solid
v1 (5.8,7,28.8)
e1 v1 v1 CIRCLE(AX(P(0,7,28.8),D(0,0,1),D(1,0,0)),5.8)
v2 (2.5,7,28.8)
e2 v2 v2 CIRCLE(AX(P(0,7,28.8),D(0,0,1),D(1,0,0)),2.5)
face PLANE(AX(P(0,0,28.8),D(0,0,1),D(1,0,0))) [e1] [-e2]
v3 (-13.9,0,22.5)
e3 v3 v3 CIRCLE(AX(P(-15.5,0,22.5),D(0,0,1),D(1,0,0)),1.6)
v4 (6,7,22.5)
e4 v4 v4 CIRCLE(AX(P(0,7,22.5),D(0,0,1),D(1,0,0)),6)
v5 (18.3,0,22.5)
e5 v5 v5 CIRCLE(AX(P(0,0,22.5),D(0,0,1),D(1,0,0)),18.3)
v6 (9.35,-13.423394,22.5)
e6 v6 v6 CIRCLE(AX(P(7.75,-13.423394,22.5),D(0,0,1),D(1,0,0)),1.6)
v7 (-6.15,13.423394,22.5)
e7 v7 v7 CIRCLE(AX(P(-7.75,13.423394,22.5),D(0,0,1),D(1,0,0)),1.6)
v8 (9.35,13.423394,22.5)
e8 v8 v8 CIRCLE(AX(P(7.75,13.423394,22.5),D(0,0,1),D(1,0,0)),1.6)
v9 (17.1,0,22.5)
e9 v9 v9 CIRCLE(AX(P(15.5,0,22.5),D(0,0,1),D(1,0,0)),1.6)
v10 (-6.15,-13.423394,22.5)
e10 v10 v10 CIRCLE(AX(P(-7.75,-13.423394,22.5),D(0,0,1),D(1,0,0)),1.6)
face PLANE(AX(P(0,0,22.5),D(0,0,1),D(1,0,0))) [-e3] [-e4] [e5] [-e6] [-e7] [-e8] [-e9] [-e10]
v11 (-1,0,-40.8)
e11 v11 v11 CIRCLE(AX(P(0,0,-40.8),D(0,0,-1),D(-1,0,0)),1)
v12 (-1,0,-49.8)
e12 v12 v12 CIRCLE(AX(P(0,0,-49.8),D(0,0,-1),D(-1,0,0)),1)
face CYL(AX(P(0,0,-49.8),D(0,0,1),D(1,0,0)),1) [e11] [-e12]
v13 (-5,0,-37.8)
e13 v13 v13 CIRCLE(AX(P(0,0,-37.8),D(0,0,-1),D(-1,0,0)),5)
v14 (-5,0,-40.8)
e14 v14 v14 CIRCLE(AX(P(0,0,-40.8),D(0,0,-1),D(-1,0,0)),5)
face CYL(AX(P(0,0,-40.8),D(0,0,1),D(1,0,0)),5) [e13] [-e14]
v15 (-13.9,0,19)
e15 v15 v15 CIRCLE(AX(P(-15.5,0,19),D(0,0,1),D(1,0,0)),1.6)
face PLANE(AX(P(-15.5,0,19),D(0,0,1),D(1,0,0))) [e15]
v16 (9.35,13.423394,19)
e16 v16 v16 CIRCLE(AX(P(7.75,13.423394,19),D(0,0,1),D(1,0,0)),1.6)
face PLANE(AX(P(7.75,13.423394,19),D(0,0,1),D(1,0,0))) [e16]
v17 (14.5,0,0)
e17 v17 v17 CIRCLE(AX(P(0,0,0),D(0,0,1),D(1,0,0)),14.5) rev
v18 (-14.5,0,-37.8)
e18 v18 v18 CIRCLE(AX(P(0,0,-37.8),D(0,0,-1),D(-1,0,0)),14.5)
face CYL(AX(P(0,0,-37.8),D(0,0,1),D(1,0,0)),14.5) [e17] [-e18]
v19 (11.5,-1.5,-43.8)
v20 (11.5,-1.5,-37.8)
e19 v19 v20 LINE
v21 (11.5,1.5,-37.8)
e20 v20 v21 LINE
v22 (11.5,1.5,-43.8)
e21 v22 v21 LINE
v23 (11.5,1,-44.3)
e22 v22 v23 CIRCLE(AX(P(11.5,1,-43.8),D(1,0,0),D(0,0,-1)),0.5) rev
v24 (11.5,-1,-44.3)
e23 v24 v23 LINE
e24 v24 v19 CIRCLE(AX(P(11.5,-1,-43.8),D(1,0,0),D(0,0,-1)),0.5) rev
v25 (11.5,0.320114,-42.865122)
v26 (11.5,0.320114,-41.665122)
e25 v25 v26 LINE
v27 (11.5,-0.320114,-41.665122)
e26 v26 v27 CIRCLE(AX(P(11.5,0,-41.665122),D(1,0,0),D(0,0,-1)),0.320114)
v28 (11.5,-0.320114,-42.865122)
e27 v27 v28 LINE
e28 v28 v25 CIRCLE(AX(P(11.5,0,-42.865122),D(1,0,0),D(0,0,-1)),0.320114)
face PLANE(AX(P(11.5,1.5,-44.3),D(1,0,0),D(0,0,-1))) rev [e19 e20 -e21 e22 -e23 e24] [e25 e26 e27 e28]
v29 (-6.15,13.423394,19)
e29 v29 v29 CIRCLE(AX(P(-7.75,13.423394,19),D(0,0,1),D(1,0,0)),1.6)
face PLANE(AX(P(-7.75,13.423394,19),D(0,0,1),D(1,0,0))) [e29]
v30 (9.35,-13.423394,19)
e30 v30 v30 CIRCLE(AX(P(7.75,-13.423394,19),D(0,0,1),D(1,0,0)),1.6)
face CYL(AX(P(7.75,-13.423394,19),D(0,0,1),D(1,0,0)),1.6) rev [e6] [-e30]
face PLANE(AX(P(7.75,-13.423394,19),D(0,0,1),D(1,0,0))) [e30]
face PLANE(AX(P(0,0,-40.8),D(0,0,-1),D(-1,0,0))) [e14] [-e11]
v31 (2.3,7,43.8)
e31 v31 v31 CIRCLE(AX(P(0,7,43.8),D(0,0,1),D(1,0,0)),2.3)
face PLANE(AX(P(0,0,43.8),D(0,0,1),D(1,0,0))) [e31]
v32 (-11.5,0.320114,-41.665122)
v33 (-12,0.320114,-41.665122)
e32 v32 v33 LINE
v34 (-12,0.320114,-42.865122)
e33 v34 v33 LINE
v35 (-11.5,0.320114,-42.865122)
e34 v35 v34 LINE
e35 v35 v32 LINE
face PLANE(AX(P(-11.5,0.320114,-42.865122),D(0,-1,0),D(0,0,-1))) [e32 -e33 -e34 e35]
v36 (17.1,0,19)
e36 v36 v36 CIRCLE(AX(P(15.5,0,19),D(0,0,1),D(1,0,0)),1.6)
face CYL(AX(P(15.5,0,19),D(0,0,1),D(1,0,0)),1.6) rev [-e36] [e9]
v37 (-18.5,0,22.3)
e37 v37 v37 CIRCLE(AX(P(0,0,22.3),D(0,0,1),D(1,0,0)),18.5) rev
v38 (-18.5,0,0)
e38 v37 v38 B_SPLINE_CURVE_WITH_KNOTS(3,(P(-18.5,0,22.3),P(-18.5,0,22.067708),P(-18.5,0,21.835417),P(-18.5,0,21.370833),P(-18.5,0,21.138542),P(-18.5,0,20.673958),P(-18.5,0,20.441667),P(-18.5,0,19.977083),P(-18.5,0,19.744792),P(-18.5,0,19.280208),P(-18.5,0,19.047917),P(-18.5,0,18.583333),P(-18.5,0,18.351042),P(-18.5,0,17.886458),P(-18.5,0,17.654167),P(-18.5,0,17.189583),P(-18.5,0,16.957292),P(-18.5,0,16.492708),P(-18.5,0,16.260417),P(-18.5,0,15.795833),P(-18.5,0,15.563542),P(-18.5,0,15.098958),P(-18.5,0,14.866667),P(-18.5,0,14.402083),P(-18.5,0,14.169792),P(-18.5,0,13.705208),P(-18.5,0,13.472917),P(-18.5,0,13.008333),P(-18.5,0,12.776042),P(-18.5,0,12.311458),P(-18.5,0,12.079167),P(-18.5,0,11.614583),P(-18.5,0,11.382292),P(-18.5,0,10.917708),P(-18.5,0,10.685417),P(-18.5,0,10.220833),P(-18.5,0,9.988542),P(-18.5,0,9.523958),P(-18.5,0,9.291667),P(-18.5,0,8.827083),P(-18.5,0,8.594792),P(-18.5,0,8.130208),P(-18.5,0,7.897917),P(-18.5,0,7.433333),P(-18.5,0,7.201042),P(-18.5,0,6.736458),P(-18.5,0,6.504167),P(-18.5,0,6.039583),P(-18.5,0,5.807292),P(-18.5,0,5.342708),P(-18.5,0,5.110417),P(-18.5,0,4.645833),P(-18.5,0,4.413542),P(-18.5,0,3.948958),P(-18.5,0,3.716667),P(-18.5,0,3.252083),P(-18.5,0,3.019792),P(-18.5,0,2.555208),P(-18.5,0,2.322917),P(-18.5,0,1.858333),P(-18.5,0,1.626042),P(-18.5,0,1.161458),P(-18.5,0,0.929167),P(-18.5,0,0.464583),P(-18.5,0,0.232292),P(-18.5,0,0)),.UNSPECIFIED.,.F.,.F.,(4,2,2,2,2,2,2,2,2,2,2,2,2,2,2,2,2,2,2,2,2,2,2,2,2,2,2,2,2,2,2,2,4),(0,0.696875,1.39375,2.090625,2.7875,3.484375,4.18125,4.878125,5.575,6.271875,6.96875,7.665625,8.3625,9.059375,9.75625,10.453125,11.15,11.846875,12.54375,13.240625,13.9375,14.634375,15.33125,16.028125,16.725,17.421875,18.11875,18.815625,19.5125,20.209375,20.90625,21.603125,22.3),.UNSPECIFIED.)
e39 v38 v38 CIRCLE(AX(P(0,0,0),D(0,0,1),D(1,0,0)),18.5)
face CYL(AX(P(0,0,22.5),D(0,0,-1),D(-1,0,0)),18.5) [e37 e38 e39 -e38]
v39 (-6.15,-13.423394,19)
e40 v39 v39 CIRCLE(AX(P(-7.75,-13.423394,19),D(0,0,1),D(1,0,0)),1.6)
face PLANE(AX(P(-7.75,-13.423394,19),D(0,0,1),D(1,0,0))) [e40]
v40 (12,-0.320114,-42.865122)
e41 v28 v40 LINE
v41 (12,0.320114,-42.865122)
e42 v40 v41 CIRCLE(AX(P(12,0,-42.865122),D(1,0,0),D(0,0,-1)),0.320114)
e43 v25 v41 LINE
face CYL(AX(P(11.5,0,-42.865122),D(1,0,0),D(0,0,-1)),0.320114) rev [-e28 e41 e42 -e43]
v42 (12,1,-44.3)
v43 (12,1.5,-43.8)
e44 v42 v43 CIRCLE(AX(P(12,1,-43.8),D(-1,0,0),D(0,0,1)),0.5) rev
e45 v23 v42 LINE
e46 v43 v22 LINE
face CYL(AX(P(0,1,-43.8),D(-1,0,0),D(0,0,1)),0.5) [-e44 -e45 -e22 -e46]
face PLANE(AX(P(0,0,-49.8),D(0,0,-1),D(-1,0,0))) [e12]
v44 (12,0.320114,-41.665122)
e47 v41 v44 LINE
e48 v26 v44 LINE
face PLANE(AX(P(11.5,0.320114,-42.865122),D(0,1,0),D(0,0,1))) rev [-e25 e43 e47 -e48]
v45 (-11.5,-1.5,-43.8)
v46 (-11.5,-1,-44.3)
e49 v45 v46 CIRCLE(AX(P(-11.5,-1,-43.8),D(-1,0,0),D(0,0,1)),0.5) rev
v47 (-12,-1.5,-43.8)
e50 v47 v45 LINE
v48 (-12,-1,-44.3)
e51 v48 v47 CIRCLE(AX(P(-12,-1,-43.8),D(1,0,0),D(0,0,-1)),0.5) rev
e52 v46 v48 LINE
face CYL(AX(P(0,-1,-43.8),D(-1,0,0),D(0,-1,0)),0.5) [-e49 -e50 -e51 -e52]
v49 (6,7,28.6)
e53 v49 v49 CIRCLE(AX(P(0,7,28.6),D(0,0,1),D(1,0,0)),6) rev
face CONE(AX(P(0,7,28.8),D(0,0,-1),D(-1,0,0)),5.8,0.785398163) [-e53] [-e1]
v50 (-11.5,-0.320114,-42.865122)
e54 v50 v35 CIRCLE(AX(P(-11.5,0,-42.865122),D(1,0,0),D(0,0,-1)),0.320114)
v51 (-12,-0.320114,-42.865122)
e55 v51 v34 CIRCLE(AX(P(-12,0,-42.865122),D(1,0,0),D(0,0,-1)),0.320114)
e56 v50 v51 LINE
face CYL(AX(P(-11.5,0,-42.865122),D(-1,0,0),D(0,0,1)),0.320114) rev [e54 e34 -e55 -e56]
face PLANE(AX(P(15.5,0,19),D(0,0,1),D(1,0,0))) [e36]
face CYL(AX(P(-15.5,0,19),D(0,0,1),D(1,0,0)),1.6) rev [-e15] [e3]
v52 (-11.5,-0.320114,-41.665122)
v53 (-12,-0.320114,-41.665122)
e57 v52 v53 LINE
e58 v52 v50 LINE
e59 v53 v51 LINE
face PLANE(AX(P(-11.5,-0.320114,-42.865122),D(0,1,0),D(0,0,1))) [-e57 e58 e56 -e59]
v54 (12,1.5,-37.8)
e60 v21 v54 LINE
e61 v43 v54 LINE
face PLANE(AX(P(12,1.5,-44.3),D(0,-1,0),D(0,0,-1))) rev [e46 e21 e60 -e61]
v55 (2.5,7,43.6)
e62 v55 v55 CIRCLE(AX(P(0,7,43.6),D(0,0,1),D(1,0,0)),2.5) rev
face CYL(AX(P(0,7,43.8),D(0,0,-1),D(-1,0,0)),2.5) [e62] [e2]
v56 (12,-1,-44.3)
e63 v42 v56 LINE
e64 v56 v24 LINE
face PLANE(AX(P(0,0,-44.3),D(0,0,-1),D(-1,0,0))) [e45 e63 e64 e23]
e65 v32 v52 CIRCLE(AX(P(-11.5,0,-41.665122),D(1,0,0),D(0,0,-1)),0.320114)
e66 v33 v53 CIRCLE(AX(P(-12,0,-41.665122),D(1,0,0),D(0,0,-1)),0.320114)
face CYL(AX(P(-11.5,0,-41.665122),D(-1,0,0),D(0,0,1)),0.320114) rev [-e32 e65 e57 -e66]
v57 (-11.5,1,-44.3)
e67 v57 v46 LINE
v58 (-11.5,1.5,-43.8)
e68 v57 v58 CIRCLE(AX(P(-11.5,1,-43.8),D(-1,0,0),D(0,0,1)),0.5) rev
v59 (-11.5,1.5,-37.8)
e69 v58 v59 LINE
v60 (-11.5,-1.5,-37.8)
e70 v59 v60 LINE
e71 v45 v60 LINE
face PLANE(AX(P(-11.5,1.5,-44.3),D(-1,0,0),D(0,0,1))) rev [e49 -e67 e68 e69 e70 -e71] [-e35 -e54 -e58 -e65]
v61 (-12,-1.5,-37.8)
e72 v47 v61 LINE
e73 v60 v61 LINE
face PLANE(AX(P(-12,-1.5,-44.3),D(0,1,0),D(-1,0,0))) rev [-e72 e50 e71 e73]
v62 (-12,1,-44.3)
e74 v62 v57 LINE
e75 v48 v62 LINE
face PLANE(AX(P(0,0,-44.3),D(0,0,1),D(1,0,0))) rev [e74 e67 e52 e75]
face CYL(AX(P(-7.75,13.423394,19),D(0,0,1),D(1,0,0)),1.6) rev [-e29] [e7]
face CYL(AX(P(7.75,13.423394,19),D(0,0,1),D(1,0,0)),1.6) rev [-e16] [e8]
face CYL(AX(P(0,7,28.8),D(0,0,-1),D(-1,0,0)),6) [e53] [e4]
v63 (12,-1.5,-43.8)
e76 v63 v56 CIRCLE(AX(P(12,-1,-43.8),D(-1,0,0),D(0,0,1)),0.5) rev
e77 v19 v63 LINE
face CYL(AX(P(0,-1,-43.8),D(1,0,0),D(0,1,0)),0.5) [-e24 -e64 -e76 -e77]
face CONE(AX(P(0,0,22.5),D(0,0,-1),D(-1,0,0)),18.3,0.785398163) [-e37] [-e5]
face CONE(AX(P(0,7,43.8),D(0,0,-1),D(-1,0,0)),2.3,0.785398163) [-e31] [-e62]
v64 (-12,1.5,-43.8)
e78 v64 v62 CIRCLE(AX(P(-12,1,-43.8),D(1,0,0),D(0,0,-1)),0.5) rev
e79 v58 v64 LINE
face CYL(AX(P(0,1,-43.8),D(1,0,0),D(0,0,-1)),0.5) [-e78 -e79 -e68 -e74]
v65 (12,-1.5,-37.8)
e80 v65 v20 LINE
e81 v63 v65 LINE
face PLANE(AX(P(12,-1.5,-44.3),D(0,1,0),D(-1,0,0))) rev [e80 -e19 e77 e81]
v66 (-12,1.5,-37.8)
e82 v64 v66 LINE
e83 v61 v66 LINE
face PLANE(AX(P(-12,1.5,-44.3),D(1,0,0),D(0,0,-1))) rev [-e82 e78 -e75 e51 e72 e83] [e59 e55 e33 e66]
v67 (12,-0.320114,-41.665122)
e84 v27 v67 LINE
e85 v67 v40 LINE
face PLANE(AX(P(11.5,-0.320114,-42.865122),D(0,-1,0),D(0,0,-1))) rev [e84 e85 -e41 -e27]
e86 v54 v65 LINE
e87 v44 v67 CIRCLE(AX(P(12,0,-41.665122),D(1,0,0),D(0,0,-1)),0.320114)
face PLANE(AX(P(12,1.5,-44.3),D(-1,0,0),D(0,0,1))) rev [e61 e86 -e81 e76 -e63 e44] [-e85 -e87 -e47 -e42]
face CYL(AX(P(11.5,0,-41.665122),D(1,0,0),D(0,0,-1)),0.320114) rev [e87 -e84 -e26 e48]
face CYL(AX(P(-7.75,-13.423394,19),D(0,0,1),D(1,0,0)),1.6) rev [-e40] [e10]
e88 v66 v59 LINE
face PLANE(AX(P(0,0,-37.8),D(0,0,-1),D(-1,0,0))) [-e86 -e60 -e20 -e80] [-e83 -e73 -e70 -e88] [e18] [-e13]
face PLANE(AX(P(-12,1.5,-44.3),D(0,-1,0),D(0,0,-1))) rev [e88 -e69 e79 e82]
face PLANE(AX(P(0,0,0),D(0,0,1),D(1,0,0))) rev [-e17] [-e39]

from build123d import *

# Parameters (mm, degrees)
SKETCH1_R           = 18.5
BOSS_EXTRUDE1_DEPTH = 22.5
SKETCH2_R           = 1.6
CUT_EXTRUDE1_DEPTH  = 3.5
SKETCH3_R           = 2.5
BOSS_EXTRUDE2_DEPTH = 21.3
SKETCH3_3_R         = 6
SKETCH3_3_R_2       = 2.5
BOSS_EXTRUDE3_DEPTH = 6.3
SKETCH4_R           = 14.5
BOSS_EXTRUDE4_DEPTH = 37.8
SKETCH5_R           = 5
BOSS_EXTRUDE5_DEPTH = 3
SKETCH6_R           = 1
BOSS_EXTRUDE6_DEPTH = 9
SKETCH7_W           = 0.5
SKETCH7_H           = 3
BOSS_EXTRUDE7_DEPTH = 6.5
CUT_EXTRUDE2_DEPTH  = 0.5
FILLET1_R           = 0.5
CHAMFER1_SIZE       = 0.2


with BuildPart() as part:
    # Sketch1 → Boss-Extrude1 (new body)
    with BuildSketch(Plane.XY):
        Circle(SKETCH1_R)
    extrude(amount=BOSS_EXTRUDE1_DEPTH)

    # Sketch2 → Cut-Extrude1 (cut)
    with BuildSketch(Plane.XY.offset(22.5)):
        with Locations((-7.75, 13.423393759)):
            Circle(SKETCH2_R)
        with Locations((7.75, 13.423393759)):
            Circle(SKETCH2_R)
        with Locations((-15.5, 0)):
            Circle(SKETCH2_R)
        with Locations((-7.75, -13.423393759)):
            Circle(SKETCH2_R)
        with Locations((7.75, -13.423393759)):
            Circle(SKETCH2_R)
        with Locations((15.5, 0)):
            Circle(SKETCH2_R)
    extrude(amount=-CUT_EXTRUDE1_DEPTH, mode=Mode.SUBTRACT)

    # Sketch3 → Boss-Extrude2 (add)
    with BuildSketch(Plane.XY.offset(22.5)):
        with Locations((0, 7)):
            Circle(SKETCH3_R)
    extrude(amount=BOSS_EXTRUDE2_DEPTH)

    # Sketch3<3> → Boss-Extrude3 (add)
    with BuildSketch(Plane.XY.offset(22.5)):
        with Locations((0, 7)):
            Circle(SKETCH3_3_R)
        with Locations((0, 7)):
            Circle(SKETCH3_3_R_2, mode=Mode.SUBTRACT)
    extrude(amount=BOSS_EXTRUDE3_DEPTH)

    # Sketch4 → Boss-Extrude4 (add)
    with BuildSketch(Plane(origin=(0, 0, 0), x_dir=(-1, 0, 0), z_dir=(0, 0, -1))):
        Circle(SKETCH4_R)
    extrude(amount=BOSS_EXTRUDE4_DEPTH)

    # Sketch5 → Boss-Extrude5 (add)
    with BuildSketch(Plane(origin=(0, 0, -37.8), x_dir=(-1, 0, 0), z_dir=(0, 0, -1))):
        Circle(SKETCH5_R)
    extrude(amount=BOSS_EXTRUDE5_DEPTH)

    # Sketch6 → Boss-Extrude6 (add)
    with BuildSketch(Plane(origin=(0, 0, -40.8), x_dir=(-1, 0, 0), z_dir=(0, 0, -1))):
        Circle(SKETCH6_R)
    extrude(amount=BOSS_EXTRUDE6_DEPTH)

    # Sketch7 → Boss-Extrude7 (add)
    with BuildSketch(Plane(origin=(0, 0, -37.8), x_dir=(-1, 0, 0), z_dir=(0, 0, -1))):
        with Locations((-11.75, 0)):
            Rectangle(SKETCH7_W, SKETCH7_H)
        with Locations((11.75, 0)):
            Rectangle(SKETCH7_W, SKETCH7_H)
    extrude(amount=BOSS_EXTRUDE7_DEPTH)

    # Sketch8 → Cut-Extrude2 (cut)
    with BuildSketch(Plane(origin=(12, 0, 0), x_dir=(0, 0, -1), z_dir=(1, 0, 0))):
        with BuildLine():
            Line((42.865122037, -0.320114275), (41.665122037, -0.320114275))
            ThreePointArc((41.665122037, -0.320114275), (41.345007763, 0), (41.665122037, 0.320114275))
            Line((41.665122037, 0.320114275), (42.865122037, 0.320114275))
            ThreePointArc((42.865122037, 0.320114275), (43.185236312, 0), (42.865122037, -0.320114275))
        make_face()
    cut_extrude2 = extrude(amount=-CUT_EXTRUDE2_DEPTH, mode=Mode.SUBTRACT)

    # Mirror2: Cut-Extrude2 across plane
    add(cut_extrude2.mirror(Plane(origin=(0, 0, 0), x_dir=(0, 0, 1), z_dir=(1, 0, 0))), mode=Mode.SUBTRACT)

    # Fillet1
    fillet1_edges = [part.edges().sort_by_distance(p)[0] for p in [
        (-11.75, 1.5, -44.3),
        (-11.75, -1.5, -44.3),
        (11.75, 1.5, -44.3),
        (11.75, -1.5, -44.3),
    ]]
    fillet(fillet1_edges, radius=FILLET1_R)

    # Chamfer1
    chamfer1_edges = [part.edges().sort_by_distance(p)[0] for p in [
        (-18.5, 0, 22.5),
        (-6, 7, 28.8),
        (-2.5, 7, 43.8),
    ]]
    chamfer(chamfer1_edges, length=CHAMFER1_SIZE)


solid = part.part
